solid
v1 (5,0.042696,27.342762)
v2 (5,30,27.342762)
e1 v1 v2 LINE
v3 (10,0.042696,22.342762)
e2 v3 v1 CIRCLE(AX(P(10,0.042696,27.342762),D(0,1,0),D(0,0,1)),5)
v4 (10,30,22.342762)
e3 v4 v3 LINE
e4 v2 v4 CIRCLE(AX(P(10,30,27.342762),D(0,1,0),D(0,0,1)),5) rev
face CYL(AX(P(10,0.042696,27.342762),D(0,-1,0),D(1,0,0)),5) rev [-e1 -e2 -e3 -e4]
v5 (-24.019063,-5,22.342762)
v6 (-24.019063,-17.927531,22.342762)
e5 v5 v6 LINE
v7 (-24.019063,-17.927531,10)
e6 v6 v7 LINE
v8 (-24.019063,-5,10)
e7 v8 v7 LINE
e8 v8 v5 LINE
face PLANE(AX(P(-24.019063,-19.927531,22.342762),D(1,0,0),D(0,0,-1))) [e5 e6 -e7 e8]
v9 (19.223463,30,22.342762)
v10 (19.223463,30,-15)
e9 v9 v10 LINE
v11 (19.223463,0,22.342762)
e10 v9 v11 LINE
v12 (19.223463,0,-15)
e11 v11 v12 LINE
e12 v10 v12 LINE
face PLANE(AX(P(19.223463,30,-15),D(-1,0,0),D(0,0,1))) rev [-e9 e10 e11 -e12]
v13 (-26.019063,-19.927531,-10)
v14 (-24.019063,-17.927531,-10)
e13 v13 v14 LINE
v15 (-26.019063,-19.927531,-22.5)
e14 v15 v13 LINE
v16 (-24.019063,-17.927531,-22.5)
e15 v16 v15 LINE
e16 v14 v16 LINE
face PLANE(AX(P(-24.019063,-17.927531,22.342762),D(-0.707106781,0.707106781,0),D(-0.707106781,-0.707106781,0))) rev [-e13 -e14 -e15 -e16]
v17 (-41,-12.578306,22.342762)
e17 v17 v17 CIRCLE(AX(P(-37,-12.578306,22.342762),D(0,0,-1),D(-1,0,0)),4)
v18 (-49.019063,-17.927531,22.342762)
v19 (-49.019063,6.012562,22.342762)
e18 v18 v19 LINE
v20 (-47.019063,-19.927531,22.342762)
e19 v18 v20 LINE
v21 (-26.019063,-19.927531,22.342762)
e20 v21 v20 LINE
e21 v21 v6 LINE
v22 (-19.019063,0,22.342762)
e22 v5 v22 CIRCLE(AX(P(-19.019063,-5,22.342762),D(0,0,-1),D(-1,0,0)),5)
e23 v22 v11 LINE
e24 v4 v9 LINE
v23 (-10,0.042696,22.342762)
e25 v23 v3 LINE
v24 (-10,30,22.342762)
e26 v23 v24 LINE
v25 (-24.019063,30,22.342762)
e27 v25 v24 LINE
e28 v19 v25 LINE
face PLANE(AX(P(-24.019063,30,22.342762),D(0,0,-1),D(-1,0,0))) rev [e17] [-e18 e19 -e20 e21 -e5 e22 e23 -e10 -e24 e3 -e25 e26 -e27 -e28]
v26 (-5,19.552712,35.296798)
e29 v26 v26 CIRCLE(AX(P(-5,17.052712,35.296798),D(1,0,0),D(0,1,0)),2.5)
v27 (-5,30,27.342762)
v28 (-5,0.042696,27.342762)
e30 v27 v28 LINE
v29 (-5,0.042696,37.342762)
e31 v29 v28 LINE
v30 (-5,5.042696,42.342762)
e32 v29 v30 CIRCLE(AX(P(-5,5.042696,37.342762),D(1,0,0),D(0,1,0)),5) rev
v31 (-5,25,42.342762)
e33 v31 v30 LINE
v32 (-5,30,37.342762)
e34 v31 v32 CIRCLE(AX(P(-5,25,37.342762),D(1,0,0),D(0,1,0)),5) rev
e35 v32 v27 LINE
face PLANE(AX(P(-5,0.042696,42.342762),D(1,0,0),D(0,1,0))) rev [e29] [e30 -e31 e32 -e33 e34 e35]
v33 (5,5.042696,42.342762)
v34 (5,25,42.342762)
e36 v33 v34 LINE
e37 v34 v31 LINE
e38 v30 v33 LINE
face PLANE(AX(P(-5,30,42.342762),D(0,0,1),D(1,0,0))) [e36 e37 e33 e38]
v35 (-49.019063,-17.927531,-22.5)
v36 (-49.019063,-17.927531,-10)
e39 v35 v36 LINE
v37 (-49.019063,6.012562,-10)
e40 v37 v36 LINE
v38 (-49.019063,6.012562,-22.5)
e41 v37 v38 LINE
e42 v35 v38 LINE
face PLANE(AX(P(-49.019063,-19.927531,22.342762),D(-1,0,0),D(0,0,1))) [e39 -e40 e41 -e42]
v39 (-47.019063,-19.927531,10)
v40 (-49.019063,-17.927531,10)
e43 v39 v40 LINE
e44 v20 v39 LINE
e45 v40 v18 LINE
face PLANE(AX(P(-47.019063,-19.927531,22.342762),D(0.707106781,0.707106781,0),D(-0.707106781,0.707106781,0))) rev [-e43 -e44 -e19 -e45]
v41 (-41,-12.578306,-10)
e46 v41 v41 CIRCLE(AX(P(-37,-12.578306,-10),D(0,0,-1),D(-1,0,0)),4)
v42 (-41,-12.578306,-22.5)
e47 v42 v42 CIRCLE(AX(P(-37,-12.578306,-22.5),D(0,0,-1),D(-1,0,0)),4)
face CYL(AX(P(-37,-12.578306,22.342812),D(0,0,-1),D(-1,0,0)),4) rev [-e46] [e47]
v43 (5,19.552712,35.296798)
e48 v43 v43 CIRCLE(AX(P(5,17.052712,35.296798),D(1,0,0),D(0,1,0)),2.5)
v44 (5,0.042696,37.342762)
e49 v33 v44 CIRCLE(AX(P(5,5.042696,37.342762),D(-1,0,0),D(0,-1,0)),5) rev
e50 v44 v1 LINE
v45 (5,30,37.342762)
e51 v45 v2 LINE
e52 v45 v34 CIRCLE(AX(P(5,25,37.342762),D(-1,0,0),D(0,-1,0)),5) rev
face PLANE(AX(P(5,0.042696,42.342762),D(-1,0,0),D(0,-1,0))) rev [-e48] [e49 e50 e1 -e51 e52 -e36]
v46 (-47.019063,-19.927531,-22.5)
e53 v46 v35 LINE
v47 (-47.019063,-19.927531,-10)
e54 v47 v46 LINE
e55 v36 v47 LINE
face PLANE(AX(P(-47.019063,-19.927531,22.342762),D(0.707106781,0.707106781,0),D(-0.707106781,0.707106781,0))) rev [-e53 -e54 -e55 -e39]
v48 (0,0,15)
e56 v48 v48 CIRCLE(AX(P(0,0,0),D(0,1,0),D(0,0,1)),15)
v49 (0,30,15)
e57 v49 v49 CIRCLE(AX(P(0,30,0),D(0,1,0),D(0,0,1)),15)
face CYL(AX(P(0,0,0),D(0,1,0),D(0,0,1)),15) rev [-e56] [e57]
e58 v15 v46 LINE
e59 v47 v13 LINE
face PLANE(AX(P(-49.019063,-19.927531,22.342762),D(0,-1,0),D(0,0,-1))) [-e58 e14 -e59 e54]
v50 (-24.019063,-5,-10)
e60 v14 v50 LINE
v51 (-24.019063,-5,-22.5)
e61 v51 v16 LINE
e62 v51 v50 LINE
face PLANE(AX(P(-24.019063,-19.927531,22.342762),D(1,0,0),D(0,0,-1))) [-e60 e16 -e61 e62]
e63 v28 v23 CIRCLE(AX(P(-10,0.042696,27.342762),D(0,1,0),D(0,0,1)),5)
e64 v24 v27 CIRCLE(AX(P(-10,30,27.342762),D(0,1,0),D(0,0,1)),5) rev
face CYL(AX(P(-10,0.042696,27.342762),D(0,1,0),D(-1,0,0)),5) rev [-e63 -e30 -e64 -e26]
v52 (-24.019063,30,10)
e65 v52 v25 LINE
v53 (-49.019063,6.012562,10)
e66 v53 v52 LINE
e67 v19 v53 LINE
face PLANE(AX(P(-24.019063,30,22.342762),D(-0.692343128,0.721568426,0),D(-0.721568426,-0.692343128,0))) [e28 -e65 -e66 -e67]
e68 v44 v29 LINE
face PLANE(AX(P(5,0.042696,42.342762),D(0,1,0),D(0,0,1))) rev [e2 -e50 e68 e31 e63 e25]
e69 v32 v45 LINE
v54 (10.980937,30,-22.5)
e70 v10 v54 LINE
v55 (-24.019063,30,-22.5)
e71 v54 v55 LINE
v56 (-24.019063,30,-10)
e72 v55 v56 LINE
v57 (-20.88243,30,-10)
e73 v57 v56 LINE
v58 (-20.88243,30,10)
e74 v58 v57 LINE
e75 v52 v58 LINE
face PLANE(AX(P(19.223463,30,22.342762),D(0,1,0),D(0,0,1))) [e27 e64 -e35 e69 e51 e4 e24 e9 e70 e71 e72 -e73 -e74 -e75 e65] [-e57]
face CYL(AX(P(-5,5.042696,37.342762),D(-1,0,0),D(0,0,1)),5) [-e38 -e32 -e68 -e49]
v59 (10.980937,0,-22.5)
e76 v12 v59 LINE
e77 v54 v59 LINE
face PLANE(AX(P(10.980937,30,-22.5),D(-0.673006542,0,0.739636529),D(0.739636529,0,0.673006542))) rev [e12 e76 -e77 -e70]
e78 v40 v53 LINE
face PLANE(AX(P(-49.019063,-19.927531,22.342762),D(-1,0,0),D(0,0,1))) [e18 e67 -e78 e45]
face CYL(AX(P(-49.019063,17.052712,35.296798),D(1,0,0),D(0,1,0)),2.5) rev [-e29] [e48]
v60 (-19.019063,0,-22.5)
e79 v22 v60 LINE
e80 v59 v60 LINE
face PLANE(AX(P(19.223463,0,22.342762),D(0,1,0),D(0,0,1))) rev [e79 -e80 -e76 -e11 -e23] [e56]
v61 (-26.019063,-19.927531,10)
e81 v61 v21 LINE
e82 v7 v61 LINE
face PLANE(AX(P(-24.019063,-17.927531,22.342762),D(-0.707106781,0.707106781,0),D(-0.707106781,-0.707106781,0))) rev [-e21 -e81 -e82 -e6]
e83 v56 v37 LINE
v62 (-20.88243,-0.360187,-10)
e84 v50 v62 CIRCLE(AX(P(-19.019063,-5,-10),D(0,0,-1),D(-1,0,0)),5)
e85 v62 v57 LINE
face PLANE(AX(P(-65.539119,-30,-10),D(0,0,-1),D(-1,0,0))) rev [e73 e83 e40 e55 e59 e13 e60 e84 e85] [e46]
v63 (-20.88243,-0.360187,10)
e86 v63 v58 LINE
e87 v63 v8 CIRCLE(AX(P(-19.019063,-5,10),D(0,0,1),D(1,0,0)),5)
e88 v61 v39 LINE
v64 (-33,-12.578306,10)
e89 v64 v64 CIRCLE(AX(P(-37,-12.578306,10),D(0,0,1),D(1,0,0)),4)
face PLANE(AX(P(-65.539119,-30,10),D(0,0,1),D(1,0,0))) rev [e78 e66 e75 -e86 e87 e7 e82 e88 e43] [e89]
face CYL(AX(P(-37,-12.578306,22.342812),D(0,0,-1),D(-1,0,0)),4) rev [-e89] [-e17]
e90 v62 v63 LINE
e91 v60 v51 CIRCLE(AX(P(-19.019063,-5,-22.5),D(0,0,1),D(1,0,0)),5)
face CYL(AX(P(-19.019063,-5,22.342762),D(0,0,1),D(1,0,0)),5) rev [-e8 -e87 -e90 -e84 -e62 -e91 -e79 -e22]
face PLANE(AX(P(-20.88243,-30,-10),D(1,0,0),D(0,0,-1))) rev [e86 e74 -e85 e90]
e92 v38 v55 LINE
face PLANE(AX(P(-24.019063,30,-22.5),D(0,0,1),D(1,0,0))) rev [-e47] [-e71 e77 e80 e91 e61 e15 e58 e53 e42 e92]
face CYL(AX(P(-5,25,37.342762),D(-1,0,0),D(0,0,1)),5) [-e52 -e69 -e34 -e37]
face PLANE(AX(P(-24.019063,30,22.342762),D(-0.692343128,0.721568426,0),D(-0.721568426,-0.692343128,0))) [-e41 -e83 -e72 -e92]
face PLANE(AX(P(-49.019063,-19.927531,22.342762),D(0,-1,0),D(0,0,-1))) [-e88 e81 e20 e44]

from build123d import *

# Parameters (mm, degrees)
EXTRUDE_1_DEPTH       = 30
SKETCH_2_R            = 15
CUT_EXTRUDE_2_DEPTH   = 45.532745299
EXTRUDE_3_DEPTH       = 44.84276
CUT_EXTRUDE_START     = 70
SKETCH_3_W            = 44.656689001
SKETCH_3_H            = 20
CUT_EXTRUDE_1_DEPTH   = 130
SKETCH_7_R            = 3.999999997
CUT_EXTRUDE_2_2_DEPTH = 73.895417278
FILLET_1_R            = 5
CHAMFER_5_SIZE        = 2
SKETCH_8_W            = 10
SKETCH_8_H            = 29.95730412
EXTRUDE_4_DEPTH       = 20
FILLET_2_R            = 5
SKETCH_10_R           = 2.5
CUT_EXTRUDE_3_DEPTH   = 75.906399488


with BuildPart() as part:
    # Эскиз1 → Вытянуть1 (new body)
    with BuildSketch(Plane(origin=(0, 0, 0), x_dir=(1, 0, 0), z_dir=(0, 1, 0))):
        Polygon((-24.019063342, 22.5), (10.980936658, 22.5), (19.22346273, 15), (19.22346273, -22.342761837), (-24.019063342, -22.342761837), align=None)
    extrude(amount=EXTRUDE_1_DEPTH)

    # Эскиз2 → Cut-Extrude 2 (cut, through all)
    with BuildSketch(Plane(origin=(0, 30, 0), x_dir=(1, 0, 0), z_dir=(0, 1, 0))):
        with Locations(Location((0, 0, 0), (0, 0, 270))):
            Circle(SKETCH_2_R)
    extrude(amount=-CUT_EXTRUDE_2_DEPTH, mode=Mode.SUBTRACT)

    # Эскиз6 → Вытянуть3 (add)
    with BuildSketch(Plane(origin=(0, 0, -22.5), x_dir=(-1, 0, 0), z_dir=(0, 0, -1))):
        Polygon((24.019063342, -19.927530698), (24.019063342, 30), (49.019063342, 6.012561534), (49.019063342, -19.927530698), align=None)
    extrude(amount=-EXTRUDE_3_DEPTH)

    # Эскиз3 → Вырез-Вытянуть1 (cut)
    with BuildSketch(Plane(origin=(0, 30, 0), x_dir=(1, 0, 0), z_dir=(0, 1, 0)).offset(CUT_EXTRUDE_START)):
        with Locations((-43.210774099, 0)):
            Rectangle(SKETCH_3_W, SKETCH_3_H)
    extrude(amount=-CUT_EXTRUDE_1_DEPTH, mode=Mode.SUBTRACT)

    # Эскиз7 → Cut-Extrude 2 2 (cut, through all)
    with BuildSketch(Plane(origin=(0, 0, -22.5), x_dir=(-1, 0, 0), z_dir=(0, 0, -1))):
        with Locations((37.000000002, -12.578306382)):
            Circle(SKETCH_7_R)
    extrude(amount=-CUT_EXTRUDE_2_2_DEPTH, mode=Mode.SUBTRACT)

    # Скругление1
    # the kernel refuses this fillet: 5 mm, written as the material it adds along each edge
    with BuildSketch(Plane(origin=(-24.019063342, 0, 34.84276), x_dir=(1, 0, 0), z_dir=(0, 0, -1))) as fillet_1_piece_1_section:
        with BuildLine():
            CenterArc((FILLET_1_R, FILLET_1_R), FILLET_1_R, 180, 90)
            Line((0, FILLET_1_R), (0, 0))
            Line((0, 0), (FILLET_1_R, 0))
        make_face()
    fillet_1_piece_1 = extrude(amount=24.84276, mode=Mode.PRIVATE)
    fillet_1_piece_1 = split(fillet_1_piece_1, bisect_by=Plane(origin=(-20.42000997, -0.107354451, 22.342761837), z_dir=(0, 0, -1)), keep=Keep.TOP, mode=Mode.PRIVATE)
    add(fillet_1_piece_1)
    with BuildSketch(Plane(origin=(-24.019063342, 0, 22.34276), x_dir=(1, 0, 0), z_dir=(0, 0, -1))) as fillet_1_piece_2_section:
        with BuildLine():
            CenterArc((FILLET_1_R, FILLET_1_R), FILLET_1_R, 180, 90)
            Line((0, FILLET_1_R), (0, 0))
            Line((0, 0), (FILLET_1_R, 0))
        make_face()
    fillet_1_piece_2 = extrude(amount=24.84276, mode=Mode.PRIVATE)
    fillet_1_piece_2 = split(fillet_1_piece_2, bisect_by=Plane(origin=(-20.882429598, -0.107354451, 3.75), z_dir=(1, 0, 0)), keep=Keep.TOP, mode=Mode.PRIVATE)
    add(fillet_1_piece_2)
    with BuildSketch(Plane(origin=(-24.019063342, 0, 2.5), x_dir=(1, 0, 0), z_dir=(0, 0, -1))) as fillet_1_piece_3_section:
        with BuildLine():
            CenterArc((FILLET_1_R, FILLET_1_R), FILLET_1_R, 180, 90)
            Line((0, FILLET_1_R), (0, 0))
            Line((0, 0), (FILLET_1_R, 0))
        make_face()
    fillet_1_piece_3 = extrude(amount=25, mode=Mode.PRIVATE)
    fillet_1_piece_3 = split(fillet_1_piece_3, bisect_by=Plane(origin=(-20.882429598, -0.107354451, -3.75), z_dir=(1, 0, 0)), keep=Keep.TOP, mode=Mode.PRIVATE)
    add(fillet_1_piece_3)
    with BuildSketch(Plane(origin=(-24.019063342, 0, -10), x_dir=(1, 0, 0), z_dir=(0, 0, -1))) as fillet_1_piece_4:
        with BuildLine():
            CenterArc((FILLET_1_R, FILLET_1_R), FILLET_1_R, 180, 90)
            Line((0, FILLET_1_R), (0, 0))
            Line((0, 0), (FILLET_1_R, 0))
        make_face()
    extrude(amount=12.5)
    # the kernel refuses this fillet: 5 mm, written as the material it takes off along each edge

    # Фаска5
    chamfer_5_edges = [part.edges().sort_by_distance(p)[0] for p in [
        (-49.019063342, -19.927530698, 16.17138),
        (-24.019063342, -19.927530698, 16.17138),
        (-24.019063342, -19.927530698, -16.25),
        (-49.019063342, -19.927530698, -16.25),
    ]]
    chamfer(chamfer_5_edges, length=CHAMFER_5_SIZE)

    # Эскиз8 → Вытянуть4 (add)
    with BuildSketch(Plane.XY.offset(22.342761837)):
        with Locations((0, 15.02134794)):
            Rectangle(SKETCH_8_W, SKETCH_8_H)
    extrude(amount=EXTRUDE_4_DEPTH)

    # Скругление2
    fillet_2_edges = [part.edges().sort_by_distance(p)[0] for p in [
        (0, 30, 42.342761837),
        (0, 0.04269588, 42.342761837),
        (-5, 15.02134794, 22.342761837),
        (5, 15.02134794, 22.342761837),
    ]]
    fillet(fillet_2_edges, radius=FILLET_2_R)

    # Эскиз10 → Вырез-Вытянуть3 (cut, through all)
    with BuildSketch(Plane(origin=(5, 0, 0), x_dir=(0, 0, -1), z_dir=(1, 0, 0))):
        with Locations(Location((-35.296798075, 17.052712081, 0), (0, 0, 90))):
            Circle(SKETCH_10_R)
    extrude(amount=-CUT_EXTRUDE_3_DEPTH, mode=Mode.SUBTRACT)


solid = part.part
